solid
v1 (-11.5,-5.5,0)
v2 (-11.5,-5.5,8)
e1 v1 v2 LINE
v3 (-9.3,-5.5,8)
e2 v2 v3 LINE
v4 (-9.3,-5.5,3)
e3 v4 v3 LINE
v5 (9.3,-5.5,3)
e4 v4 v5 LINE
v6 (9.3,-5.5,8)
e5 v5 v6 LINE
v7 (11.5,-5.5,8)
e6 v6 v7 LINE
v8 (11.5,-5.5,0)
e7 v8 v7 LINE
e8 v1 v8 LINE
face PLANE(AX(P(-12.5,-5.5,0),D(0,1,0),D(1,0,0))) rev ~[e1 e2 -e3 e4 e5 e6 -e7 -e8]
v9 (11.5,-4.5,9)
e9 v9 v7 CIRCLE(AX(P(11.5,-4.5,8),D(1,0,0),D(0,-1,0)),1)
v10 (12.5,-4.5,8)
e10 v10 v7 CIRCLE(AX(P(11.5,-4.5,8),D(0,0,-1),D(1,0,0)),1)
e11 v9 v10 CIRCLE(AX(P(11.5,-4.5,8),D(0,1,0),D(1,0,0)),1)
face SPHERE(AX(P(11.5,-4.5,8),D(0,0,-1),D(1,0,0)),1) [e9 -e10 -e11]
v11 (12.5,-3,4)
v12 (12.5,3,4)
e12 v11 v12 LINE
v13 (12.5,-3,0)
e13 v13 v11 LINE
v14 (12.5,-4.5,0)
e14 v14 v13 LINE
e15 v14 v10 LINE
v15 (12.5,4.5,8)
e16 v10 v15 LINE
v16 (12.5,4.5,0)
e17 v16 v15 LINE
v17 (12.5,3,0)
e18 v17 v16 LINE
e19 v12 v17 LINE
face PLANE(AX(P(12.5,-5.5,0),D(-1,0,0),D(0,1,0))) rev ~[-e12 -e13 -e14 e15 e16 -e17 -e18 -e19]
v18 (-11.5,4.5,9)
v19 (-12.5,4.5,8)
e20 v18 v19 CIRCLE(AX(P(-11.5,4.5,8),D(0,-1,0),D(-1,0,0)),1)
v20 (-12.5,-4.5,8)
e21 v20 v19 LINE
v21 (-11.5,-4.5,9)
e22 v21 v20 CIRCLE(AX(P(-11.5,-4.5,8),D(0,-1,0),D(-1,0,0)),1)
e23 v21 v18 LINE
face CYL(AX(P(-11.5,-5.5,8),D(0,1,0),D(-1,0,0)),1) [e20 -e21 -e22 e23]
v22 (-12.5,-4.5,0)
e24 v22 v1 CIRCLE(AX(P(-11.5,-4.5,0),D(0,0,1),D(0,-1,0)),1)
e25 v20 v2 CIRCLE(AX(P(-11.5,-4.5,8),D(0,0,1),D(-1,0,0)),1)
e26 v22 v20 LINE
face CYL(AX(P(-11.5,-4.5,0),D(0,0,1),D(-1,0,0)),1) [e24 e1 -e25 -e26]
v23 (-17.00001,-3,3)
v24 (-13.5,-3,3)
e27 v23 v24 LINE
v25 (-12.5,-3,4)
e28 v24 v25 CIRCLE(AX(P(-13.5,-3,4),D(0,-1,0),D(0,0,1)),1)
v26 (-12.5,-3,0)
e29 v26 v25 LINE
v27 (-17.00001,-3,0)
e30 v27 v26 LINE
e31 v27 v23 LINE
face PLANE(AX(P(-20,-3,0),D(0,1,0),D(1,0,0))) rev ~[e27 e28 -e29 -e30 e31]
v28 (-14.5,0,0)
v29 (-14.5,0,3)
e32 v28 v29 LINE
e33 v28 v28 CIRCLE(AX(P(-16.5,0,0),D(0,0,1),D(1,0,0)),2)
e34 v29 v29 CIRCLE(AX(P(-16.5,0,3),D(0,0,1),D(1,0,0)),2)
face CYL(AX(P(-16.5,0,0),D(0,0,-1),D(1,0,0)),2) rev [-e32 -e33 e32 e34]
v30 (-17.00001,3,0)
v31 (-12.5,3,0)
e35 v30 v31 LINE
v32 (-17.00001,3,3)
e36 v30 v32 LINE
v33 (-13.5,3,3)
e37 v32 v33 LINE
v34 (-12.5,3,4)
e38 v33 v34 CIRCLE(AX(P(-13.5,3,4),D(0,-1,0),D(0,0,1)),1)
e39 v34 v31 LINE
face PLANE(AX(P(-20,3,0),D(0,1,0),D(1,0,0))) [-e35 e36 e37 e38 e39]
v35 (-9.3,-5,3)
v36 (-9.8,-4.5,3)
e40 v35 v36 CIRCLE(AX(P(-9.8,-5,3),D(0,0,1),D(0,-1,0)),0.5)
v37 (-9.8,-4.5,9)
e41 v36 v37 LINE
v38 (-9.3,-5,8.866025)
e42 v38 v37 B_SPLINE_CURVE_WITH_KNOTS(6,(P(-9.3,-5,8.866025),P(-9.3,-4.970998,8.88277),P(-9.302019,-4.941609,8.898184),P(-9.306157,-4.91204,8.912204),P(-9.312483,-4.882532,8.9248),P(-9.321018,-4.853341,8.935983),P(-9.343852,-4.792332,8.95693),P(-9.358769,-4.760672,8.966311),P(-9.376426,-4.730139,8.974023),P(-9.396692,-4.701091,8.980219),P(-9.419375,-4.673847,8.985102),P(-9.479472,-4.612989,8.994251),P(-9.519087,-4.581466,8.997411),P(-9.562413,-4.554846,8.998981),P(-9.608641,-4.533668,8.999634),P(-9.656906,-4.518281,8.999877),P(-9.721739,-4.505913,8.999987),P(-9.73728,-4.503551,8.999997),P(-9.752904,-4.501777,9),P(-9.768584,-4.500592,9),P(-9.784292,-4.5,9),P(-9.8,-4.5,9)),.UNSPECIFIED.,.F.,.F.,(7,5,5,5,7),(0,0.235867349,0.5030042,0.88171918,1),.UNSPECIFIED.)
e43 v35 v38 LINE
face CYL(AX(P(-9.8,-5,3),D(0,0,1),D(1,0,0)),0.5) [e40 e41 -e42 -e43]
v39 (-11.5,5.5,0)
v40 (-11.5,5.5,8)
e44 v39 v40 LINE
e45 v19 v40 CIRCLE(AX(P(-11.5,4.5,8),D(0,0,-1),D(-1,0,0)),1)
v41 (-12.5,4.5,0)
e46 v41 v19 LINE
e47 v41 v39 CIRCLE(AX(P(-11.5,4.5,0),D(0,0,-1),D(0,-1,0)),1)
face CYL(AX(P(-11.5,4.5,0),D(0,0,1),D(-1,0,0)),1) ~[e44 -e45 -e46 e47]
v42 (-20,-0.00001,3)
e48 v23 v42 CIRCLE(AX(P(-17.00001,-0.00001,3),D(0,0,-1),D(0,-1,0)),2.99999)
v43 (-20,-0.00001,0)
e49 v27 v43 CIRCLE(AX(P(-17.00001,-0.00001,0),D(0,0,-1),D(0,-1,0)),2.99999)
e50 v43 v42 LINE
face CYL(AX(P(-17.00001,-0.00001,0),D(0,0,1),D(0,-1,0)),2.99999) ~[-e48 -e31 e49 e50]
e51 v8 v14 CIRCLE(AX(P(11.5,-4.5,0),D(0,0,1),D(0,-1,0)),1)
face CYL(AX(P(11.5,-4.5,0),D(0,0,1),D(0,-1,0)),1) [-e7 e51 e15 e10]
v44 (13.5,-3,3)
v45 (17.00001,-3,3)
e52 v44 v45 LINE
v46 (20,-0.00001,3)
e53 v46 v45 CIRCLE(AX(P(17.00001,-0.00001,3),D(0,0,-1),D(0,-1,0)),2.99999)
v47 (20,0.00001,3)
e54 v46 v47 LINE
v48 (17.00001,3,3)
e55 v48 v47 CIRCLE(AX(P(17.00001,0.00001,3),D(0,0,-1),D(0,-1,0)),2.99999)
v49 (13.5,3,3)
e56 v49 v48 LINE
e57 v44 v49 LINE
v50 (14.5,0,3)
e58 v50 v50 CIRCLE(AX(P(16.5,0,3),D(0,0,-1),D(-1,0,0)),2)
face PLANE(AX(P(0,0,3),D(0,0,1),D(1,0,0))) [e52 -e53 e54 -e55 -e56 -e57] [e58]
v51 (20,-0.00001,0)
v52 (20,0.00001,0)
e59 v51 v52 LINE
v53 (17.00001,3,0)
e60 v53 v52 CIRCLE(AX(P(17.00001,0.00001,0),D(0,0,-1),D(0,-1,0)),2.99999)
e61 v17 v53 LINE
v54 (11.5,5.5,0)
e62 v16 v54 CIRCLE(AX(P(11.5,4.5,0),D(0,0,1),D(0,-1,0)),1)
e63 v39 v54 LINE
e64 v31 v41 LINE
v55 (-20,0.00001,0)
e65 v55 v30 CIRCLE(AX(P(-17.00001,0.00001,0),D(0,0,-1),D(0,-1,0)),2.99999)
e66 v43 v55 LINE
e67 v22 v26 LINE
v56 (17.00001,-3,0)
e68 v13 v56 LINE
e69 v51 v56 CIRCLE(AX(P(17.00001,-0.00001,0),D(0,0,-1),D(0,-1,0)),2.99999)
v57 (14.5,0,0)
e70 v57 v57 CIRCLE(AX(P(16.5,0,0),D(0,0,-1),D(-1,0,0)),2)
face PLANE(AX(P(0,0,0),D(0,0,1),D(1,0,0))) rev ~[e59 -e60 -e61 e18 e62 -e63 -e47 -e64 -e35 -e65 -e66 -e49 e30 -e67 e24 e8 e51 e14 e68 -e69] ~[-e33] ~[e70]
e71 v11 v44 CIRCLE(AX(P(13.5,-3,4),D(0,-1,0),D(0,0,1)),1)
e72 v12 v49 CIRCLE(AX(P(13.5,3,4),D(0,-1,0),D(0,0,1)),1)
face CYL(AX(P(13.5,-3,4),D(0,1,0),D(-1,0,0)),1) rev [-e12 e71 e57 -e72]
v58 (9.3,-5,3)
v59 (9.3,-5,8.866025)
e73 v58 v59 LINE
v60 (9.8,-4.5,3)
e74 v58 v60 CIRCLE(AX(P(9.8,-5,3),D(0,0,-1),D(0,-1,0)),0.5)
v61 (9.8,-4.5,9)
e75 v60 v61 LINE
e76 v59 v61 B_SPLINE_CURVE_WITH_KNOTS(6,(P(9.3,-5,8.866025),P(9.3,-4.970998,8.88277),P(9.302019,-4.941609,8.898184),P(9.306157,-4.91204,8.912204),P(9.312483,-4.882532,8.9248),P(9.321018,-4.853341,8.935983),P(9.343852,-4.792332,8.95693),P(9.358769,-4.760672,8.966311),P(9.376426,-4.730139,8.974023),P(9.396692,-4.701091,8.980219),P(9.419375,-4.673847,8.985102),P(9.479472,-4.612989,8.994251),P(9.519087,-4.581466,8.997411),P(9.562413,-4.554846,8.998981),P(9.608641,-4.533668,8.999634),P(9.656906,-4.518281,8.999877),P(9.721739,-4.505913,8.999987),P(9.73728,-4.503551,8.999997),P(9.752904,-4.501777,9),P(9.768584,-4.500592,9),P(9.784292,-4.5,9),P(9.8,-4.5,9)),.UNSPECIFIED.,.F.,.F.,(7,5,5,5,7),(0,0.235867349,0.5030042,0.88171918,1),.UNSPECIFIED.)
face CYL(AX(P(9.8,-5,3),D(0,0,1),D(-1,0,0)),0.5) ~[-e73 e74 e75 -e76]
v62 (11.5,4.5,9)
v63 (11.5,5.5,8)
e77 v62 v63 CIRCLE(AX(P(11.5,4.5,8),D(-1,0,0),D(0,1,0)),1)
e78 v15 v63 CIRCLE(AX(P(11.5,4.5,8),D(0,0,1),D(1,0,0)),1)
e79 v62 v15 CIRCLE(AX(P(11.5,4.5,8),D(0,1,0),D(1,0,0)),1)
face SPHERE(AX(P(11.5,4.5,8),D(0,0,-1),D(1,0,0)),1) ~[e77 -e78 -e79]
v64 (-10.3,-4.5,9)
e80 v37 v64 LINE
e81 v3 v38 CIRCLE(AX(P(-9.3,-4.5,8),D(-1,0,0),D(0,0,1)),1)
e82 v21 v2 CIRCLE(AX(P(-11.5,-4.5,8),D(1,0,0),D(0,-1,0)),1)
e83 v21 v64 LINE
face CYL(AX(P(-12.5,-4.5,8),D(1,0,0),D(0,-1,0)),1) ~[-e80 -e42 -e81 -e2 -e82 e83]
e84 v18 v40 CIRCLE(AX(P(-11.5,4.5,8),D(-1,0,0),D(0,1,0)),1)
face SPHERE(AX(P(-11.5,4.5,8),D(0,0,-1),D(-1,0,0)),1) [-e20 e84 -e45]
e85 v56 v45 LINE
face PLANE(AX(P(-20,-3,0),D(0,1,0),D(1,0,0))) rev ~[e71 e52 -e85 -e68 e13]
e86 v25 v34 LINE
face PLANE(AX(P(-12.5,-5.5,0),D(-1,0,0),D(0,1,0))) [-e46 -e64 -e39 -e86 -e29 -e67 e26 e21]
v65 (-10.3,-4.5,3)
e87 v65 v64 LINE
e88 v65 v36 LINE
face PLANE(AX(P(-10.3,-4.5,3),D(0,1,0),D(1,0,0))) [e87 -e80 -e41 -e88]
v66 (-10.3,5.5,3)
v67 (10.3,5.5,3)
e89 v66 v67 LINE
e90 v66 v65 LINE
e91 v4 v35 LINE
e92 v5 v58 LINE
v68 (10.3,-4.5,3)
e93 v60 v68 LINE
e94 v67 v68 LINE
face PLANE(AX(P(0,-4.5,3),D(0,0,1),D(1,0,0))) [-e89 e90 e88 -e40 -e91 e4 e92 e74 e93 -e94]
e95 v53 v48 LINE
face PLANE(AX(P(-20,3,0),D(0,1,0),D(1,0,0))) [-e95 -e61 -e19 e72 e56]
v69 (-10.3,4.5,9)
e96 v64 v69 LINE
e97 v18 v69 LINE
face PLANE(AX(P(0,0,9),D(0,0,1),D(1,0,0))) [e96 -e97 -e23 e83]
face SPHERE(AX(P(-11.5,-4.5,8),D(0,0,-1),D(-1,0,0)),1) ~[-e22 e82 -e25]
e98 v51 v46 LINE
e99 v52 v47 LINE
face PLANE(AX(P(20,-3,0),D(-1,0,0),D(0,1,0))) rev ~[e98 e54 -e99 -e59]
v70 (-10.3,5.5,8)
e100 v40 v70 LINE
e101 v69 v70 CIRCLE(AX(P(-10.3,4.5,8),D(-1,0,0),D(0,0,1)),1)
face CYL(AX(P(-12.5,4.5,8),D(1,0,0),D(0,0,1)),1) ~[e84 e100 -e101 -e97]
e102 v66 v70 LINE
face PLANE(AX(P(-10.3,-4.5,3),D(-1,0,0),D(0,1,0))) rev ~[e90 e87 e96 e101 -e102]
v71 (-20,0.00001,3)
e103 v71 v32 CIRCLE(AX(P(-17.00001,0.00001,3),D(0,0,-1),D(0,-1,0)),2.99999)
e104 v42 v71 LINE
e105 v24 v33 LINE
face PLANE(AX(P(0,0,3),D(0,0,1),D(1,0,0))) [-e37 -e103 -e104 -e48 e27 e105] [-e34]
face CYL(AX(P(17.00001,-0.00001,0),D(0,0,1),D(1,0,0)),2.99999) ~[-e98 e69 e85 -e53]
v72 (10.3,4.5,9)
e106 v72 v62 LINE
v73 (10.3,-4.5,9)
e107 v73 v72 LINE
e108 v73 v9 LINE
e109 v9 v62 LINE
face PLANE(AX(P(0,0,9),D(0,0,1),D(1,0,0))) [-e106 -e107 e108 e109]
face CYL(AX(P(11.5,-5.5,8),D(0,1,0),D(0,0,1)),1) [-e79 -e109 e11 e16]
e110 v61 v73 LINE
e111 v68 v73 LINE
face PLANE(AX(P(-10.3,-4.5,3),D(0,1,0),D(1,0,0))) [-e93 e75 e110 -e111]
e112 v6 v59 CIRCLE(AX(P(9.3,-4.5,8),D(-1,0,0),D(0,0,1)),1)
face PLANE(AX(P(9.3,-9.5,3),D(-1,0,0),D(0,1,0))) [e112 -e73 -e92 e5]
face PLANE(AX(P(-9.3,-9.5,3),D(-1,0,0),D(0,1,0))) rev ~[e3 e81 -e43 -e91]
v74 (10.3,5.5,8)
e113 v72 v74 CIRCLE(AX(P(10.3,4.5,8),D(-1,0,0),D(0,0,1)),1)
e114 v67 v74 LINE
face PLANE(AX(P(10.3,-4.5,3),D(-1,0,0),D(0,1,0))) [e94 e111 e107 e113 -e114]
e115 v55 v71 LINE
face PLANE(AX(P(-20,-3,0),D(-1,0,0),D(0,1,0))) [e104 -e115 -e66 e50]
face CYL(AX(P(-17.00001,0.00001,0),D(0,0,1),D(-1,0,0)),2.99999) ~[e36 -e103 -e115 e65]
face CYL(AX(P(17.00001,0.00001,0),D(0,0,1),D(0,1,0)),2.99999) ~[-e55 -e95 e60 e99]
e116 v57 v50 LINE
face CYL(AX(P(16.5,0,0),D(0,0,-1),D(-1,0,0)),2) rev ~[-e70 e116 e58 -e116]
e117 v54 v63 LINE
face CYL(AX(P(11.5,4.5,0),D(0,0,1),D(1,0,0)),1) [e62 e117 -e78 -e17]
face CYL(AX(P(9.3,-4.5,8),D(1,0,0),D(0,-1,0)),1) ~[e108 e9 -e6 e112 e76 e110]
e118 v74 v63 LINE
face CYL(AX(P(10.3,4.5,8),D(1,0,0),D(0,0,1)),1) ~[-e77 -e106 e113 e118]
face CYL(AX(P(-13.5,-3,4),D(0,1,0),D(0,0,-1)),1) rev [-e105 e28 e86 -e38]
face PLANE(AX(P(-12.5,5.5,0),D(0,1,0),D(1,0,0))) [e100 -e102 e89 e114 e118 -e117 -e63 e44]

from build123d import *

# Parameters (mm, degrees)
F0_W      = 25
F0_H      = 11
F1_DEPTH  = 9
F2_W      = 20.6
F2_H      = 10
F3_DEPTH  = 6
F4_W      = 18.6
F4_H      = 10
F5_DEPTH  = 6
F8_R      = 0.5
F11_W     = 40
F11_H     = 6
F11_R     = 2
F12_DEPTH = 3
F13_R     = 1
F14_R     = 2.99999


# Not quite as in the source:
# - a fillet or chamfer is up to 0.001 mm smaller than in the source, because OpenCascade refuses the exact size


with BuildPart() as f1:
    # F0 (on Top) → F1 (new body)
    with BuildSketch(Plane.XY):
        Rectangle(F0_W, F0_H)
    extrude(amount=F1_DEPTH)


with BuildPart() as f3:
    # F2 (on Top) → F3 (new body)
    with BuildSketch(Plane.XY):
        Rectangle(F2_W, F2_H)
    extrude(amount=F3_DEPTH)


with BuildPart() as f5:
    # F4 (on Top) → F5 (new body)
    with BuildSketch(Plane.XY):
        Rectangle(F4_W, F4_H)
    extrude(amount=F5_DEPTH)


with BuildPart() as f5_1:
    # F6: moved
    add(f5.part.moved(Location((0, -5, 0))))


with BuildPart() as f3_1:
    add(f3.part)

    # F7: union F5
    add(f5_1.part)

    # F8
    f8_edges = [f3_1.edges().sort_by_distance(p)[0] for p in [
        (-9.3, -5, 3),
        (9.3, -5, 3),
    ]]
    fillet(f8_edges, radius=F8_R)


with BuildPart() as f3_2:
    # F9: moved
    add(f3_1.part.moved(Location((0, 0.5, 3))))


with BuildPart() as f1_1:
    add(f1.part)

    # F10: cut F3
    add(f3_2.part, mode=Mode.SUBTRACT)

    # F11 (on Top) → F12 (join)
    with BuildSketch(Plane.XY):
        Rectangle(F11_W, F11_H)
        with Locations((-16.5, 0)):
            Circle(F11_R, mode=Mode.SUBTRACT)
        with BuildLine():
            ThreePointArc((18.5, 0), (16.5, -2), (14.5, 0))
            ThreePointArc((14.5, 0), (16.5, 2), (18.5, 0))
        make_face(mode=Mode.SUBTRACT)
    extrude(amount=F12_DEPTH)

    # F13
    f13_edges = [f1_1.edges().sort_by_distance(p)[0] for p in [
        (-12.5, 5.5, 4.5),
        (-12.5, -5.5, 4.5),
        (12.5, -5.5, 4.5),
        (12.5, 5.5, 4.5),
        (12.5, 0, 3),
        (-12.5, 0, 3),
        (-12.5, 0, 9),
        (12.5, 0, 9),
        (-11.4, 5.5, 9),
        (11.4, 5.5, 9),
        (10.9, -5.5, 9),
        (-10.9, -5.5, 9),
    ]]
    fillet(f13_edges, radius=F13_R)

    # F14 (radius 3 in the source; OpenCascade refuses exactly that, so slightly less here)
    f14_edges = [f1_1.edges().sort_by_distance(p)[0] for p in [
        (-20, -3, 1.5),
        (-20, 3, 1.5),
        (20, 3, 1.5),
        (20, -3, 1.5),
    ]]
    fillet(f14_edges, radius=F14_R)


solid = f1_1.part
